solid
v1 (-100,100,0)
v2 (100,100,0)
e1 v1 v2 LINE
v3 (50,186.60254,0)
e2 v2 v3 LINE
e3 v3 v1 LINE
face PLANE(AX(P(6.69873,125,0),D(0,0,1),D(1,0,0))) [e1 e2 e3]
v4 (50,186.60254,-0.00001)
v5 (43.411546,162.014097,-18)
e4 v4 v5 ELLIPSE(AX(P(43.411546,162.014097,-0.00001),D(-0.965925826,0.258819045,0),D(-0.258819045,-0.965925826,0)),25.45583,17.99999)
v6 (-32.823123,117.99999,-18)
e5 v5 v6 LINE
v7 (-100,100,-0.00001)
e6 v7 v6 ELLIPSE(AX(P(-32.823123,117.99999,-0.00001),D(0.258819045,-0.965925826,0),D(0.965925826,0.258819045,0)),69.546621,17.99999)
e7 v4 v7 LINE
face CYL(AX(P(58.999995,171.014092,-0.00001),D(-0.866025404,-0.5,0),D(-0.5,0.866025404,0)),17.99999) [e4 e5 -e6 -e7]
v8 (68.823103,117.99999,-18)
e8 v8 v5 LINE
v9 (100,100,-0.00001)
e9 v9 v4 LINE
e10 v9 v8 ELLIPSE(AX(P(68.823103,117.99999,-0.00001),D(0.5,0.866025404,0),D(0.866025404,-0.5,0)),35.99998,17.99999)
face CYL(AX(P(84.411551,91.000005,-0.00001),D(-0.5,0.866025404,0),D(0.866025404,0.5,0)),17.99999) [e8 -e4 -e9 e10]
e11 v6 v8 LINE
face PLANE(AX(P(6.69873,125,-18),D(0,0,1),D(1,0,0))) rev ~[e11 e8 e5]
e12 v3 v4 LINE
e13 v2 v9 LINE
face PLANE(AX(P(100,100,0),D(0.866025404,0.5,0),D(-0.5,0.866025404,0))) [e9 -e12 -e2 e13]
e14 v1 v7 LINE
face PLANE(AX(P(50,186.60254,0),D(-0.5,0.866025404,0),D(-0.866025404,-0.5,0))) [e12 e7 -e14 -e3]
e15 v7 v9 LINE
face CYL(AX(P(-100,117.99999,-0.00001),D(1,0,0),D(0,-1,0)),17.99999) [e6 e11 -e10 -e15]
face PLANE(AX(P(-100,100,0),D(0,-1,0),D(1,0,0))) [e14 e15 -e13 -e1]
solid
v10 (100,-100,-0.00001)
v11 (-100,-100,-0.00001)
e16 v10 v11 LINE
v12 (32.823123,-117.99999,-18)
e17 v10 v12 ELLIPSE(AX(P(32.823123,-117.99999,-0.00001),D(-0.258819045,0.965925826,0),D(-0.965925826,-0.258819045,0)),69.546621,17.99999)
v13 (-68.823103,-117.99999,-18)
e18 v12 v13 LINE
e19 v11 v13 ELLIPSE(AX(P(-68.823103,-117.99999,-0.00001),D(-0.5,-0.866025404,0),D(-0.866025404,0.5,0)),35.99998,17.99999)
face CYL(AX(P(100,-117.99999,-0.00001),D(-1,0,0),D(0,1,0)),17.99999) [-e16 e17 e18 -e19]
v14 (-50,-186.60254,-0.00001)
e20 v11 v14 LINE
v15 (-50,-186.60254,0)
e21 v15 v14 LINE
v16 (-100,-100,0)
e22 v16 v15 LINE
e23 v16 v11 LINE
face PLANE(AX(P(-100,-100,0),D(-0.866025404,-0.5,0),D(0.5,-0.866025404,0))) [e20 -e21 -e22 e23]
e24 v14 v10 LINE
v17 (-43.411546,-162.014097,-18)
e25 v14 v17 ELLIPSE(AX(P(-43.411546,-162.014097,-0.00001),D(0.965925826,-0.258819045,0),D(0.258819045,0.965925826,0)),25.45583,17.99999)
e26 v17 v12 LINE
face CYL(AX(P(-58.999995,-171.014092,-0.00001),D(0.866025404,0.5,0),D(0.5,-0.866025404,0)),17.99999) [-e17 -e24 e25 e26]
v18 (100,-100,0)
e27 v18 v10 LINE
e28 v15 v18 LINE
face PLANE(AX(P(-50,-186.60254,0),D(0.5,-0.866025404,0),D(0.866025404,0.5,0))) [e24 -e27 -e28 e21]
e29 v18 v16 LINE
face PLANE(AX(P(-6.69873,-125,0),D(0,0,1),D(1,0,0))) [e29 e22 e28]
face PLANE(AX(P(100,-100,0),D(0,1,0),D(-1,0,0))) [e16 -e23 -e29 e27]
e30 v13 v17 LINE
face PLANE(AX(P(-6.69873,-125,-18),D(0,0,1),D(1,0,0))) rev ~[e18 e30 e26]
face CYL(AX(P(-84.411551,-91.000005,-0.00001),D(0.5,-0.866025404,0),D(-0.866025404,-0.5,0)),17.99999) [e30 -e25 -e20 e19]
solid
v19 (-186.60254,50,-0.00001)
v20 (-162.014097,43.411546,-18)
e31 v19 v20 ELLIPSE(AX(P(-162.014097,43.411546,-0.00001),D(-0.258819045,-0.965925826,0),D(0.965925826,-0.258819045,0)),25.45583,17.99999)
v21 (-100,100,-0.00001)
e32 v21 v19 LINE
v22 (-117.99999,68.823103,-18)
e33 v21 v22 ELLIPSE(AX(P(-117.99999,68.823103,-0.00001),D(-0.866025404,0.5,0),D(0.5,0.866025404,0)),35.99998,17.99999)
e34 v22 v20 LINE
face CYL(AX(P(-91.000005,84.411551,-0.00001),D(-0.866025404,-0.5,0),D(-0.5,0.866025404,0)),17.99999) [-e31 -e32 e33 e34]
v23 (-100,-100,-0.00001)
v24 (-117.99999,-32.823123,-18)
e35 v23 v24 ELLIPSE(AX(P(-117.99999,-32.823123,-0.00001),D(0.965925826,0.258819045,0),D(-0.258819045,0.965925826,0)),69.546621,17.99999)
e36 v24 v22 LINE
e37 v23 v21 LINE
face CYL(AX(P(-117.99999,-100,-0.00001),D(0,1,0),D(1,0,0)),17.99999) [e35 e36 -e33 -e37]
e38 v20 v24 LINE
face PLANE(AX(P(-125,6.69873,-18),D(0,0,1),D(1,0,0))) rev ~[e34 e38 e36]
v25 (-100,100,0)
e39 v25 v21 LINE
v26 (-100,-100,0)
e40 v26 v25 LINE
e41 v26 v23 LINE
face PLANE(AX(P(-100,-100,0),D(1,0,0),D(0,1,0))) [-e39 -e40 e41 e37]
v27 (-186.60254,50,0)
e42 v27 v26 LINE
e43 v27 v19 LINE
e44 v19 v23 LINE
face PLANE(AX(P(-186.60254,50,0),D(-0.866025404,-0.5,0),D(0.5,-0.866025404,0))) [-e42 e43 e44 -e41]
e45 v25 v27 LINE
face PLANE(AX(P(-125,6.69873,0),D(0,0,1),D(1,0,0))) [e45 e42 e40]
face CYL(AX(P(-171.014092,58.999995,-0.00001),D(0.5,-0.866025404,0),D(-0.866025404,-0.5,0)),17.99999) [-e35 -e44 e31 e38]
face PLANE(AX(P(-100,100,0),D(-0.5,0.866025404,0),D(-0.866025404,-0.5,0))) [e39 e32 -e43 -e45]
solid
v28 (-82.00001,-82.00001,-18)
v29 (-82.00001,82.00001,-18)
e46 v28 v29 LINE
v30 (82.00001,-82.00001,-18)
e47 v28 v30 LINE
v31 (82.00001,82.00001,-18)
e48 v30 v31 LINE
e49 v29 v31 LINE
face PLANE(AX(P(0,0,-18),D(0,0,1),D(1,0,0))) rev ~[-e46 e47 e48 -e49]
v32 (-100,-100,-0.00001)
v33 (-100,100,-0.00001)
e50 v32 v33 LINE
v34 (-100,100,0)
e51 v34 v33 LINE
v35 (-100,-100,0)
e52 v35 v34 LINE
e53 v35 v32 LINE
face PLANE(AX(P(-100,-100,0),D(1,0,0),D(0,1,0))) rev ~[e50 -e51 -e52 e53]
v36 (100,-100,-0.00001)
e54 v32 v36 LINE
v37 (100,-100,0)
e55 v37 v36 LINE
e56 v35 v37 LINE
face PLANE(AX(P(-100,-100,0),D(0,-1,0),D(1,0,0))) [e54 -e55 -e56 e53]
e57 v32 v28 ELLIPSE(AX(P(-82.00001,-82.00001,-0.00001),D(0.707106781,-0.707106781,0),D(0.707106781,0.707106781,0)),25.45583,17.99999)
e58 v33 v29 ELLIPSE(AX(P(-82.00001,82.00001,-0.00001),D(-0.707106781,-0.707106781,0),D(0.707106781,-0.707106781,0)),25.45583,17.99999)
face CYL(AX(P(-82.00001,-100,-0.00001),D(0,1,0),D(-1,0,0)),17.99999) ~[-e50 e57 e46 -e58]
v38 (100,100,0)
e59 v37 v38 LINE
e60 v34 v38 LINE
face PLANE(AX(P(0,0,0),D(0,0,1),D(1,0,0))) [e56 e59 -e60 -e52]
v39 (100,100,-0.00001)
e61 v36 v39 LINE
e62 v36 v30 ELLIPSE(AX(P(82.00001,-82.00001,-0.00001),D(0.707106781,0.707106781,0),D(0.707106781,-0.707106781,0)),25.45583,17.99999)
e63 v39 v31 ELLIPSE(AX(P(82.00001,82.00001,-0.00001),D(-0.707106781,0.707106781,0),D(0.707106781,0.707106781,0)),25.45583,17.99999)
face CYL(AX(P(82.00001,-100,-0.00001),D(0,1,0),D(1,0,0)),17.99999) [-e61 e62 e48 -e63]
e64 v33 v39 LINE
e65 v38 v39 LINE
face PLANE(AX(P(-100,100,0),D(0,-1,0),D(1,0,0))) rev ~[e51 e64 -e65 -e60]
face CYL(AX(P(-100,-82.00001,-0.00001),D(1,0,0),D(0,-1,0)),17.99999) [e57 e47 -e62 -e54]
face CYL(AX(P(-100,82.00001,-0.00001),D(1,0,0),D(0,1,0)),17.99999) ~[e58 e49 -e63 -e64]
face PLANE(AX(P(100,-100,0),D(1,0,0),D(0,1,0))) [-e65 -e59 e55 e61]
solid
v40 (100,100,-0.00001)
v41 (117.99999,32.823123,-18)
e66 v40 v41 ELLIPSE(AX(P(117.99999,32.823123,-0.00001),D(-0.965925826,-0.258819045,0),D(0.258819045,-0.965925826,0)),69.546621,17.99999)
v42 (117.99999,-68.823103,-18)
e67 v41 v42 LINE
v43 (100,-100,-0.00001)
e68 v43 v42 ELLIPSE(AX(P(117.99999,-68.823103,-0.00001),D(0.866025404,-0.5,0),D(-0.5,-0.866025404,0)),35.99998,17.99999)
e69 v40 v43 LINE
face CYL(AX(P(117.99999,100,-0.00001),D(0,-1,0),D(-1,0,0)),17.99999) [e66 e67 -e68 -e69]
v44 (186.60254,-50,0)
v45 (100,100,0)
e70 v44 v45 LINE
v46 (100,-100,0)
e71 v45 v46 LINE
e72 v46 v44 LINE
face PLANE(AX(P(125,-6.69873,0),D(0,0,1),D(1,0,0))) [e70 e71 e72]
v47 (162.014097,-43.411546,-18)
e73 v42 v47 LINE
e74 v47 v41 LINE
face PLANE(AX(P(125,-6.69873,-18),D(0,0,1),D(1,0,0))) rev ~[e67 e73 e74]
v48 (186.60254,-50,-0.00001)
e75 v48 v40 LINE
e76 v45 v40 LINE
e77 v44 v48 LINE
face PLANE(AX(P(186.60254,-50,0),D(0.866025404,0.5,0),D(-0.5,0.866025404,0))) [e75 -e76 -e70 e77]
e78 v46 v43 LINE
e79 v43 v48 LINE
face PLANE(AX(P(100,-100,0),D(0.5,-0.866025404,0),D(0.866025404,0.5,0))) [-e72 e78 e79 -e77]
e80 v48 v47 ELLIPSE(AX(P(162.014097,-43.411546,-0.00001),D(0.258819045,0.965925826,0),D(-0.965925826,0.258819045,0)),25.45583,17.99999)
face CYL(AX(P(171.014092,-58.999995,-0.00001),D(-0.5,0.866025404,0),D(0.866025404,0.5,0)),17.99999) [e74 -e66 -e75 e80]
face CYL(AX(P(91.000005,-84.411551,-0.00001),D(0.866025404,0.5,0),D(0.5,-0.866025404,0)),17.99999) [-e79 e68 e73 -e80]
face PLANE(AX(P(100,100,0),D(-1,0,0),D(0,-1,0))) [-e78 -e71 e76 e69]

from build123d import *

# Parameters (mm, degrees)
F0_W     = 200
F0_H     = 200
F1_DEPTH = 18
F2_DEPTH = 18
F3_R     = 17.99999
F3_2_R   = 17.99999
F3_3_R   = 17.99999
F3_4_R   = 17.99999
F3_5_R   = 17.99999


# Not quite as in the source:
# - a fillet or chamfer is up to 0.001 mm smaller than in the source, because OpenCascade refuses the exact size


with BuildPart() as f1:
    # F0 (on Top) → F1 (new body)
    with BuildSketch(Plane.XY):
        Rectangle(F0_W, F0_H)
    extrude(amount=-F1_DEPTH)

    # F3 (radius 18 in the source; OpenCascade refuses exactly that, so slightly less here)
    f3_edges = [f1.edges().sort_by_distance(p)[0] for p in [
        (0, -100, -18),
        (100, 0, -18),
        (0, 100, -18),
        (-100, 0, -18),
    ]]
    fillet(f3_edges, radius=F3_R)


with BuildPart() as f2:
    # F0 (on Top) → F2 (new body)
    with BuildSketch(Plane.XY):
        Polygon((-186.6025403784, 50), (-100, -100), (-100, 100), align=None)
    extrude(amount=-F2_DEPTH)

    # F3#5 (radius 18 in the source; OpenCascade refuses exactly that, so slightly less here)
    f3_5_edges = [f2.edges().sort_by_distance(p)[0] for p in [
        (-100, 0, -18),
        (-143.30127, -25, -18),
        (-143.30127, 75, -18),
    ]]
    fillet(f3_5_edges, radius=F3_5_R)


with BuildPart() as f2b:
    # F0 (on Top) → F2, piece 2 (new body)
    with BuildSketch(Plane.XY):
        Polygon((-100, 100), (100, 100), (50, 186.6025403784), align=None)
    extrude(amount=-F2_DEPTH)

    # F3#4 (radius 18 in the source; OpenCascade refuses exactly that, so slightly less here)
    f3_4_edges = [f2b.edges().sort_by_distance(p)[0] for p in [
        (0, 100, -18),
        (-25, 143.30127, -18),
        (75, 143.30127, -18),
    ]]
    fillet(f3_4_edges, radius=F3_4_R)


with BuildPart() as f2c:
    # F0 (on Top) → F2, piece 3 (new body)
    with BuildSketch(Plane.XY):
        Polygon((100, 100), (100, -100), (186.6025403784, -50), align=None)
    extrude(amount=-F2_DEPTH)

    # F3#3 (radius 18 in the source; OpenCascade refuses exactly that, so slightly less here)
    f3_3_edges = [f2c.edges().sort_by_distance(p)[0] for p in [
        (100, 0, -18),
        (143.30127, 25, -18),
        (143.30127, -75, -18),
    ]]
    fillet(f3_3_edges, radius=F3_3_R)


with BuildPart() as f2d:
    # F0 (on Top) → F2, piece 4 (new body)
    with BuildSketch(Plane.XY):
        Polygon((-50, -186.6025403784), (100, -100), (-100, -100), align=None)
    extrude(amount=-F2_DEPTH)

    # F3#2 (radius 18 in the source; OpenCascade refuses exactly that, so slightly less here)
    f3_2_edges = [f2d.edges().sort_by_distance(p)[0] for p in [
        (0, -100, -18),
        (25, -143.30127, -18),
        (-75, -143.30127, -18),
    ]]
    fillet(f3_2_edges, radius=F3_2_R)


solid = Compound([f1.part, f2.part, f2b.part, f2c.part, f2d.part])
